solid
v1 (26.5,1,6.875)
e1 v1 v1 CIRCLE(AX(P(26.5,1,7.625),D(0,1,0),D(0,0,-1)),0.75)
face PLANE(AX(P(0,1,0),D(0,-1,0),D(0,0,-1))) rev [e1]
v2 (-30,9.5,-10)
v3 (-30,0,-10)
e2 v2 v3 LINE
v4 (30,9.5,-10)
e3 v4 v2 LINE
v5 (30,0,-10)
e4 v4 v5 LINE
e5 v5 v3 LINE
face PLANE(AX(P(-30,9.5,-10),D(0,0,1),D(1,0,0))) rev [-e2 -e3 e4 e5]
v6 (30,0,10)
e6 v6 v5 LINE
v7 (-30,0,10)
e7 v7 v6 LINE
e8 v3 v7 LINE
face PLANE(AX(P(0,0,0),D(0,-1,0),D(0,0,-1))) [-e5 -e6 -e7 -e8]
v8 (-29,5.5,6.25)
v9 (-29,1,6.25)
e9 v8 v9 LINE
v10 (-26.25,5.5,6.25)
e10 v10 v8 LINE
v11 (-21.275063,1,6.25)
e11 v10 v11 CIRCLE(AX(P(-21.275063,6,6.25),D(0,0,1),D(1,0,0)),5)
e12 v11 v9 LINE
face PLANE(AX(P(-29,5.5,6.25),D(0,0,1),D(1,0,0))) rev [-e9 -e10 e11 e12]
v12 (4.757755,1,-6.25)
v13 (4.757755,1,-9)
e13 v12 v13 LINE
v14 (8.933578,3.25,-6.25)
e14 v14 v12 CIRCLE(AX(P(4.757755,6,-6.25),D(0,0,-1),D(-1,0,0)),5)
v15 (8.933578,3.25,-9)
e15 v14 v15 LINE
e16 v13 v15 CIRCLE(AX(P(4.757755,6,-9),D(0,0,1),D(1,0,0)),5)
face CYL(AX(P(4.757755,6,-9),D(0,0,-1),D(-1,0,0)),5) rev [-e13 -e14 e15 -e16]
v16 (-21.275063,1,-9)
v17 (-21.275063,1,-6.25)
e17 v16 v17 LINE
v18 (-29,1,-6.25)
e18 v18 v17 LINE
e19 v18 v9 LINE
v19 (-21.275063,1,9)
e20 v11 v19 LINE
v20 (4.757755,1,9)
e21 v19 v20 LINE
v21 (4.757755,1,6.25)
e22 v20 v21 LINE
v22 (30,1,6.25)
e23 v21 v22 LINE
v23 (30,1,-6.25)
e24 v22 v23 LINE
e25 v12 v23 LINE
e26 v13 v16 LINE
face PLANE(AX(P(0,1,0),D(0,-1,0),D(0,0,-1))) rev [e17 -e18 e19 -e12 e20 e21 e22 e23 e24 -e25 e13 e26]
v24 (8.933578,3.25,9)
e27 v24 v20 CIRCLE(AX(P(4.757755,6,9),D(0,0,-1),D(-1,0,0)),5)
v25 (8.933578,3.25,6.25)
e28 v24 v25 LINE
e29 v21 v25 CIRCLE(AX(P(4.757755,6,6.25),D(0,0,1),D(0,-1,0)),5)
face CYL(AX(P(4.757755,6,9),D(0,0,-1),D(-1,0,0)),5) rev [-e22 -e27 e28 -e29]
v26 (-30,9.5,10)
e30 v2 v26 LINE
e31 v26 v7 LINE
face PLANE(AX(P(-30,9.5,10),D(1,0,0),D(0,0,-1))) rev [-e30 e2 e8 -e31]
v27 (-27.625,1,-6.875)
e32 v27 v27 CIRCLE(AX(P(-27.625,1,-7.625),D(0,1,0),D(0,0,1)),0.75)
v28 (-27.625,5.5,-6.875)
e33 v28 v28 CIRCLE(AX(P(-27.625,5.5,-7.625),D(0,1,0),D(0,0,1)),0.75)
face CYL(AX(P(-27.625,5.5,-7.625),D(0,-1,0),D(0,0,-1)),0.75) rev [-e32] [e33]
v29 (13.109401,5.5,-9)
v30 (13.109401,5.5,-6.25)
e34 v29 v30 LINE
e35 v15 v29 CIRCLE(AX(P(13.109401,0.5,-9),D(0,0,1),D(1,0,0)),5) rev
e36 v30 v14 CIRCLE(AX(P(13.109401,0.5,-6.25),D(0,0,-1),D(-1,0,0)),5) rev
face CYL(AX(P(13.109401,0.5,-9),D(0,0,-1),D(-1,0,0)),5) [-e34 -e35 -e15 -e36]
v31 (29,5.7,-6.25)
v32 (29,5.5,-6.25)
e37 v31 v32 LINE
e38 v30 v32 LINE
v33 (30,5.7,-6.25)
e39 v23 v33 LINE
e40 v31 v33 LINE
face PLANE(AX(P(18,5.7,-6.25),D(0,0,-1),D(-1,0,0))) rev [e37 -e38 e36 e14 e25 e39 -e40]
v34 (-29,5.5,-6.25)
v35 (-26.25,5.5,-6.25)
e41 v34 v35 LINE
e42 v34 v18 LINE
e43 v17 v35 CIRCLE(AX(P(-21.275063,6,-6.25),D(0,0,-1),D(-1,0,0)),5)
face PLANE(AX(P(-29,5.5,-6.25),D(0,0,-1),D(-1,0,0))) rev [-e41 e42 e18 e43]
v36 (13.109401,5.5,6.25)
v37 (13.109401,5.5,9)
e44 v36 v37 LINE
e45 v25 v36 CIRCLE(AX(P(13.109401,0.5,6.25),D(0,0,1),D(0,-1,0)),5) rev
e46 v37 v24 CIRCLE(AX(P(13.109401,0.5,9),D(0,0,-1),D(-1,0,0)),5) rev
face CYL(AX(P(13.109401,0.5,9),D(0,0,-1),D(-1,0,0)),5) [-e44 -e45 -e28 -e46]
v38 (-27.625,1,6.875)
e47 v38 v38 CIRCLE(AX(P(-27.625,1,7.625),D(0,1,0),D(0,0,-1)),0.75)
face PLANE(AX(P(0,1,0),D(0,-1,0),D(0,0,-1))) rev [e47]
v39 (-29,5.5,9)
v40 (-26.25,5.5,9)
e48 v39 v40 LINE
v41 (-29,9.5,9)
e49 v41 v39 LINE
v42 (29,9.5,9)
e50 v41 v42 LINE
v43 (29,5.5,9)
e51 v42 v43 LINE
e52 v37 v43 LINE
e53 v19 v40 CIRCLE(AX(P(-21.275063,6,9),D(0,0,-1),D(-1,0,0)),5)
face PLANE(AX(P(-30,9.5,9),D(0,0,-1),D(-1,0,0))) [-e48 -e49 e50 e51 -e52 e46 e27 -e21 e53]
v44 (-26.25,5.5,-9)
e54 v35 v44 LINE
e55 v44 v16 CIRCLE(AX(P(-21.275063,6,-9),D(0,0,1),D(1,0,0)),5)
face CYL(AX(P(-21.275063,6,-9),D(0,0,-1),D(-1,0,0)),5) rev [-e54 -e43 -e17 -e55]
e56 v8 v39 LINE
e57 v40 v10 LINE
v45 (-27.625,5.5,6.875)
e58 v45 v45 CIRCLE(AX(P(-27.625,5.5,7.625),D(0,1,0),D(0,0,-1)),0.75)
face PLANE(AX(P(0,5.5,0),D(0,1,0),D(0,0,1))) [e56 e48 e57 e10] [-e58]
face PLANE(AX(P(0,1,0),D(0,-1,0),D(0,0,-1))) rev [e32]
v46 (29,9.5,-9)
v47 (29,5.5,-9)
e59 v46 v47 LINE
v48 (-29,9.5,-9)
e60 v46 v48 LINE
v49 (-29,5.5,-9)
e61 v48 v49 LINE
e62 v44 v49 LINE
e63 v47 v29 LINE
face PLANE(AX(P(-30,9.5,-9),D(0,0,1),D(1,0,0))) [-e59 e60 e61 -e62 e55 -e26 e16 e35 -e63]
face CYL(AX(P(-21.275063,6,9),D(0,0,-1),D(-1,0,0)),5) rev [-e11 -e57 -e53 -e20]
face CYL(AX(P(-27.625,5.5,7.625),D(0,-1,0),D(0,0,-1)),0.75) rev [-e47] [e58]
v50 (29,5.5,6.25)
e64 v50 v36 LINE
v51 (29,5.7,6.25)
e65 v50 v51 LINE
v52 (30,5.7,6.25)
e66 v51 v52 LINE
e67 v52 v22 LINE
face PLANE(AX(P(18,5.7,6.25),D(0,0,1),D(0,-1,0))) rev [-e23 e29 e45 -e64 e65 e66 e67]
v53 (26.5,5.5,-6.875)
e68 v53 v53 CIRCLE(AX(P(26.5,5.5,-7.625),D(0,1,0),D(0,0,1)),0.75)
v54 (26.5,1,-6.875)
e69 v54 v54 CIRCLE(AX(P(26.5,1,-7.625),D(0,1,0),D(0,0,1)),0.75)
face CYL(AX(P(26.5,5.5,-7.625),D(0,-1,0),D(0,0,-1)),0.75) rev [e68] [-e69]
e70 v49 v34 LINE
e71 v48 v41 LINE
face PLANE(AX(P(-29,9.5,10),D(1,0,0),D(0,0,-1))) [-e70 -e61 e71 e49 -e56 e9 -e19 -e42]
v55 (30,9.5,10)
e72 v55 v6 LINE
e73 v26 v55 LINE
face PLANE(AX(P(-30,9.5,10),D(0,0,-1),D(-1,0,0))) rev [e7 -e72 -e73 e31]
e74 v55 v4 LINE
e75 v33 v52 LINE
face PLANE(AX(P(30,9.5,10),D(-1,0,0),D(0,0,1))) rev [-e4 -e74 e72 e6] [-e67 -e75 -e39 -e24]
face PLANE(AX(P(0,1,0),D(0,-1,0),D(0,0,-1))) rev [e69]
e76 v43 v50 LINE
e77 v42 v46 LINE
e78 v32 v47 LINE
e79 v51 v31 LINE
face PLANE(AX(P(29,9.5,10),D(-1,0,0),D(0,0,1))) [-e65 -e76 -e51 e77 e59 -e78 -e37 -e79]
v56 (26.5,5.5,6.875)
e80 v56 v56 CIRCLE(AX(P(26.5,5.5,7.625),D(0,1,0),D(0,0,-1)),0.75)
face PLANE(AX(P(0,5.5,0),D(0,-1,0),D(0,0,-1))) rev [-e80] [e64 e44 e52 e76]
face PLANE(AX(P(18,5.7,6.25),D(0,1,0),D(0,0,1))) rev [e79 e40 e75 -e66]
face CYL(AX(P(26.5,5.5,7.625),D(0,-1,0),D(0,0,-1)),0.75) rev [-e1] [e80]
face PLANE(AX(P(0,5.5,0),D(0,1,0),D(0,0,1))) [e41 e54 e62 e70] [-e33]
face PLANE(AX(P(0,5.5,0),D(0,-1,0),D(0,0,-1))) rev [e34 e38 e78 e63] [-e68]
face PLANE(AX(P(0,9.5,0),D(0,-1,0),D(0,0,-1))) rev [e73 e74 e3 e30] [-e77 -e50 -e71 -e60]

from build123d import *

# Parameters (mm, degrees)
SKETCH1_W           = 60
SKETCH1_H           = 20
BOSS_EXTRUDE1_DEPTH = 9.5
SHELL1_T            = -1
SKETCH2_W           = 12.5
SKETCH2_H           = 4.7
CUT_EXTRUDE1_DEPTH  = 12
SKETCH3_W           = 19.267308131
SKETCH3_H           = 2.75
SKETCH3_R           = 0.75
SKETCH3_W_2         = 2.75
BOSS_EXTRUDE2_DEPTH = 4.5
FILLET1_R           = 5
FILLET2_R           = 5


with BuildPart() as part:
    # Sketch1 → Boss-Extrude1 (new body)
    with BuildSketch(Plane(origin=(0, 0, 0), x_dir=(1, 0, 0), z_dir=(0, 1, 0))):
        Rectangle(SKETCH1_W, SKETCH1_H)
    extrude(amount=BOSS_EXTRUDE1_DEPTH)

    # Shell1
    shell1_openings = [part.faces().sort_by_distance(p)[0] for p in [
        (0, 9.5, 0),
    ]]
    offset(amount=SHELL1_T, openings=shell1_openings, kind=Kind.INTERSECTION)

    # Sketch2 → Cut-Extrude1 (cut)
    with BuildSketch(Plane(origin=(30, 0, 0), x_dir=(0, 0, -1), z_dir=(1, 0, 0))):
        with Locations((0, 3.35)):
            Rectangle(SKETCH2_W, SKETCH2_H)
    extrude(amount=-CUT_EXTRUDE1_DEPTH, mode=Mode.SUBTRACT)

    # Sketch3 → Boss-Extrude2 (add)
    # profile 1 of 4: a face of its own
    with BuildSketch(Plane(origin=(0, 1, 0), x_dir=(1, 0, 0), z_dir=(0, 1, 0))):
        with Locations((19.366345935, 7.625)):
            Rectangle(SKETCH3_W, SKETCH3_H)
        with Locations(Location((26.5, 7.625, 0), (0, 0, 270))):
            Circle(SKETCH3_R, mode=Mode.SUBTRACT)
    # profile 2 of 4: a face of its own
    with BuildSketch(Plane(origin=(0, 1, 0), x_dir=(1, 0, 0), z_dir=(0, 1, 0))):
        with Locations((-27.625, 7.625)):
            Rectangle(SKETCH3_W_2, SKETCH3_H)
        with Locations(Location((-27.625, 7.625, 0), (0, 0, 270))):
            Circle(SKETCH3_R, mode=Mode.SUBTRACT)
    # profile 3 of 4: a face of its own
    with BuildSketch(Plane(origin=(0, 1, 0), x_dir=(1, 0, 0), z_dir=(0, 1, 0))):
        with Locations((-27.625, -7.625)):
            Rectangle(SKETCH3_W_2, SKETCH3_H)
        with Locations(Location((-27.625, -7.625, 0), (0, 0, 90))):
            Circle(SKETCH3_R, mode=Mode.SUBTRACT)
    # profile 4 of 4: a face of its own
    with BuildSketch(Plane(origin=(0, 1, 0), x_dir=(1, 0, 0), z_dir=(0, 1, 0))):
        with Locations((19.366345935, -7.625)):
            Rectangle(SKETCH3_W, SKETCH3_H)
        with Locations(Location((26.5, -7.625, 0), (0, 0, 90))):
            Circle(SKETCH3_R, mode=Mode.SUBTRACT)
    extrude(amount=BOSS_EXTRUDE2_DEPTH)

    # Fillet1
    # the kernel refuses this fillet: 5 mm, written as the material it adds along each edge
    with BuildSketch(Plane(origin=(-26.25, 1, 9), x_dir=(1, 0, 0), z_dir=(0, 0, -1))) as fillet1_piece_1:
        with BuildLine():
            CenterArc((4.974937186, -5), FILLET1_R, 90, 84.260829523)
            Line((0, -4.5), (-0.099498744, -4.49))
            ThreePointArc((-0.099498744, -4.49), (-0.1, -2.25), (-0.1, 0))
            Line((-0.1, 0), (0, 0.1))
            Line((0, 0.1), (4.974937186, 0.1))
            Line((4.974937186, 0.1), (4.974937186, 0))
        make_face()
    extrude(amount=2.75)
    with BuildSketch(Plane(origin=(-26.25, 1, -9), x_dir=(1, 0, 0), z_dir=(0, 0, 1)), Plane(origin=(9.732691869, 1, 9), x_dir=(-1, 0, 0), z_dir=(0, 0, -1))) as fillet1_piece_2:
        with BuildLine():
            CenterArc((4.974937186, 5), FILLET1_R, 185.739170477, 84.260829523)
            Line((0, 4.5), (-0.099498744, 4.49))
            ThreePointArc((-0.099498744, 4.49), (-0.1, 2.25), (-0.1, 0))
            Line((-0.1, 0), (0, -0.1))
            Line((0, -0.1), (4.974937186, -0.1))
            Line((4.974937186, -0.1), (4.974937186, 0))
        make_face()
    extrude(amount=2.75)
    with BuildSketch(Plane(origin=(9.732691869, 1, -9), x_dir=(0, 1, 0), z_dir=(0, 0, 1))) as fillet1_piece_3:
        with BuildLine():
            CenterArc((5, 4.974937186), FILLET1_R, 180, 84.260829523)
            Line((0, 4.974937186), (-0.1, 4.974937186))
            Line((-0.1, 4.974937186), (-0.1, 0))
            Line((-0.1, 0), (0, -0.1))
            ThreePointArc((0, -0.1), (2.25, -0.1), (4.49, -0.099498744))
            Line((4.49, -0.099498744), (4.5, 0))
        make_face()
    extrude(amount=2.75)

    # Fillet2
    fillet2_edges = [part.edges().sort_by_distance(p)[0] for p in [
        (9.732691869, 5.5, -7.625),
        (9.732691869, 5.5, 7.625),
    ]]
    fillet(fillet2_edges, radius=FILLET2_R)


solid = part.part
